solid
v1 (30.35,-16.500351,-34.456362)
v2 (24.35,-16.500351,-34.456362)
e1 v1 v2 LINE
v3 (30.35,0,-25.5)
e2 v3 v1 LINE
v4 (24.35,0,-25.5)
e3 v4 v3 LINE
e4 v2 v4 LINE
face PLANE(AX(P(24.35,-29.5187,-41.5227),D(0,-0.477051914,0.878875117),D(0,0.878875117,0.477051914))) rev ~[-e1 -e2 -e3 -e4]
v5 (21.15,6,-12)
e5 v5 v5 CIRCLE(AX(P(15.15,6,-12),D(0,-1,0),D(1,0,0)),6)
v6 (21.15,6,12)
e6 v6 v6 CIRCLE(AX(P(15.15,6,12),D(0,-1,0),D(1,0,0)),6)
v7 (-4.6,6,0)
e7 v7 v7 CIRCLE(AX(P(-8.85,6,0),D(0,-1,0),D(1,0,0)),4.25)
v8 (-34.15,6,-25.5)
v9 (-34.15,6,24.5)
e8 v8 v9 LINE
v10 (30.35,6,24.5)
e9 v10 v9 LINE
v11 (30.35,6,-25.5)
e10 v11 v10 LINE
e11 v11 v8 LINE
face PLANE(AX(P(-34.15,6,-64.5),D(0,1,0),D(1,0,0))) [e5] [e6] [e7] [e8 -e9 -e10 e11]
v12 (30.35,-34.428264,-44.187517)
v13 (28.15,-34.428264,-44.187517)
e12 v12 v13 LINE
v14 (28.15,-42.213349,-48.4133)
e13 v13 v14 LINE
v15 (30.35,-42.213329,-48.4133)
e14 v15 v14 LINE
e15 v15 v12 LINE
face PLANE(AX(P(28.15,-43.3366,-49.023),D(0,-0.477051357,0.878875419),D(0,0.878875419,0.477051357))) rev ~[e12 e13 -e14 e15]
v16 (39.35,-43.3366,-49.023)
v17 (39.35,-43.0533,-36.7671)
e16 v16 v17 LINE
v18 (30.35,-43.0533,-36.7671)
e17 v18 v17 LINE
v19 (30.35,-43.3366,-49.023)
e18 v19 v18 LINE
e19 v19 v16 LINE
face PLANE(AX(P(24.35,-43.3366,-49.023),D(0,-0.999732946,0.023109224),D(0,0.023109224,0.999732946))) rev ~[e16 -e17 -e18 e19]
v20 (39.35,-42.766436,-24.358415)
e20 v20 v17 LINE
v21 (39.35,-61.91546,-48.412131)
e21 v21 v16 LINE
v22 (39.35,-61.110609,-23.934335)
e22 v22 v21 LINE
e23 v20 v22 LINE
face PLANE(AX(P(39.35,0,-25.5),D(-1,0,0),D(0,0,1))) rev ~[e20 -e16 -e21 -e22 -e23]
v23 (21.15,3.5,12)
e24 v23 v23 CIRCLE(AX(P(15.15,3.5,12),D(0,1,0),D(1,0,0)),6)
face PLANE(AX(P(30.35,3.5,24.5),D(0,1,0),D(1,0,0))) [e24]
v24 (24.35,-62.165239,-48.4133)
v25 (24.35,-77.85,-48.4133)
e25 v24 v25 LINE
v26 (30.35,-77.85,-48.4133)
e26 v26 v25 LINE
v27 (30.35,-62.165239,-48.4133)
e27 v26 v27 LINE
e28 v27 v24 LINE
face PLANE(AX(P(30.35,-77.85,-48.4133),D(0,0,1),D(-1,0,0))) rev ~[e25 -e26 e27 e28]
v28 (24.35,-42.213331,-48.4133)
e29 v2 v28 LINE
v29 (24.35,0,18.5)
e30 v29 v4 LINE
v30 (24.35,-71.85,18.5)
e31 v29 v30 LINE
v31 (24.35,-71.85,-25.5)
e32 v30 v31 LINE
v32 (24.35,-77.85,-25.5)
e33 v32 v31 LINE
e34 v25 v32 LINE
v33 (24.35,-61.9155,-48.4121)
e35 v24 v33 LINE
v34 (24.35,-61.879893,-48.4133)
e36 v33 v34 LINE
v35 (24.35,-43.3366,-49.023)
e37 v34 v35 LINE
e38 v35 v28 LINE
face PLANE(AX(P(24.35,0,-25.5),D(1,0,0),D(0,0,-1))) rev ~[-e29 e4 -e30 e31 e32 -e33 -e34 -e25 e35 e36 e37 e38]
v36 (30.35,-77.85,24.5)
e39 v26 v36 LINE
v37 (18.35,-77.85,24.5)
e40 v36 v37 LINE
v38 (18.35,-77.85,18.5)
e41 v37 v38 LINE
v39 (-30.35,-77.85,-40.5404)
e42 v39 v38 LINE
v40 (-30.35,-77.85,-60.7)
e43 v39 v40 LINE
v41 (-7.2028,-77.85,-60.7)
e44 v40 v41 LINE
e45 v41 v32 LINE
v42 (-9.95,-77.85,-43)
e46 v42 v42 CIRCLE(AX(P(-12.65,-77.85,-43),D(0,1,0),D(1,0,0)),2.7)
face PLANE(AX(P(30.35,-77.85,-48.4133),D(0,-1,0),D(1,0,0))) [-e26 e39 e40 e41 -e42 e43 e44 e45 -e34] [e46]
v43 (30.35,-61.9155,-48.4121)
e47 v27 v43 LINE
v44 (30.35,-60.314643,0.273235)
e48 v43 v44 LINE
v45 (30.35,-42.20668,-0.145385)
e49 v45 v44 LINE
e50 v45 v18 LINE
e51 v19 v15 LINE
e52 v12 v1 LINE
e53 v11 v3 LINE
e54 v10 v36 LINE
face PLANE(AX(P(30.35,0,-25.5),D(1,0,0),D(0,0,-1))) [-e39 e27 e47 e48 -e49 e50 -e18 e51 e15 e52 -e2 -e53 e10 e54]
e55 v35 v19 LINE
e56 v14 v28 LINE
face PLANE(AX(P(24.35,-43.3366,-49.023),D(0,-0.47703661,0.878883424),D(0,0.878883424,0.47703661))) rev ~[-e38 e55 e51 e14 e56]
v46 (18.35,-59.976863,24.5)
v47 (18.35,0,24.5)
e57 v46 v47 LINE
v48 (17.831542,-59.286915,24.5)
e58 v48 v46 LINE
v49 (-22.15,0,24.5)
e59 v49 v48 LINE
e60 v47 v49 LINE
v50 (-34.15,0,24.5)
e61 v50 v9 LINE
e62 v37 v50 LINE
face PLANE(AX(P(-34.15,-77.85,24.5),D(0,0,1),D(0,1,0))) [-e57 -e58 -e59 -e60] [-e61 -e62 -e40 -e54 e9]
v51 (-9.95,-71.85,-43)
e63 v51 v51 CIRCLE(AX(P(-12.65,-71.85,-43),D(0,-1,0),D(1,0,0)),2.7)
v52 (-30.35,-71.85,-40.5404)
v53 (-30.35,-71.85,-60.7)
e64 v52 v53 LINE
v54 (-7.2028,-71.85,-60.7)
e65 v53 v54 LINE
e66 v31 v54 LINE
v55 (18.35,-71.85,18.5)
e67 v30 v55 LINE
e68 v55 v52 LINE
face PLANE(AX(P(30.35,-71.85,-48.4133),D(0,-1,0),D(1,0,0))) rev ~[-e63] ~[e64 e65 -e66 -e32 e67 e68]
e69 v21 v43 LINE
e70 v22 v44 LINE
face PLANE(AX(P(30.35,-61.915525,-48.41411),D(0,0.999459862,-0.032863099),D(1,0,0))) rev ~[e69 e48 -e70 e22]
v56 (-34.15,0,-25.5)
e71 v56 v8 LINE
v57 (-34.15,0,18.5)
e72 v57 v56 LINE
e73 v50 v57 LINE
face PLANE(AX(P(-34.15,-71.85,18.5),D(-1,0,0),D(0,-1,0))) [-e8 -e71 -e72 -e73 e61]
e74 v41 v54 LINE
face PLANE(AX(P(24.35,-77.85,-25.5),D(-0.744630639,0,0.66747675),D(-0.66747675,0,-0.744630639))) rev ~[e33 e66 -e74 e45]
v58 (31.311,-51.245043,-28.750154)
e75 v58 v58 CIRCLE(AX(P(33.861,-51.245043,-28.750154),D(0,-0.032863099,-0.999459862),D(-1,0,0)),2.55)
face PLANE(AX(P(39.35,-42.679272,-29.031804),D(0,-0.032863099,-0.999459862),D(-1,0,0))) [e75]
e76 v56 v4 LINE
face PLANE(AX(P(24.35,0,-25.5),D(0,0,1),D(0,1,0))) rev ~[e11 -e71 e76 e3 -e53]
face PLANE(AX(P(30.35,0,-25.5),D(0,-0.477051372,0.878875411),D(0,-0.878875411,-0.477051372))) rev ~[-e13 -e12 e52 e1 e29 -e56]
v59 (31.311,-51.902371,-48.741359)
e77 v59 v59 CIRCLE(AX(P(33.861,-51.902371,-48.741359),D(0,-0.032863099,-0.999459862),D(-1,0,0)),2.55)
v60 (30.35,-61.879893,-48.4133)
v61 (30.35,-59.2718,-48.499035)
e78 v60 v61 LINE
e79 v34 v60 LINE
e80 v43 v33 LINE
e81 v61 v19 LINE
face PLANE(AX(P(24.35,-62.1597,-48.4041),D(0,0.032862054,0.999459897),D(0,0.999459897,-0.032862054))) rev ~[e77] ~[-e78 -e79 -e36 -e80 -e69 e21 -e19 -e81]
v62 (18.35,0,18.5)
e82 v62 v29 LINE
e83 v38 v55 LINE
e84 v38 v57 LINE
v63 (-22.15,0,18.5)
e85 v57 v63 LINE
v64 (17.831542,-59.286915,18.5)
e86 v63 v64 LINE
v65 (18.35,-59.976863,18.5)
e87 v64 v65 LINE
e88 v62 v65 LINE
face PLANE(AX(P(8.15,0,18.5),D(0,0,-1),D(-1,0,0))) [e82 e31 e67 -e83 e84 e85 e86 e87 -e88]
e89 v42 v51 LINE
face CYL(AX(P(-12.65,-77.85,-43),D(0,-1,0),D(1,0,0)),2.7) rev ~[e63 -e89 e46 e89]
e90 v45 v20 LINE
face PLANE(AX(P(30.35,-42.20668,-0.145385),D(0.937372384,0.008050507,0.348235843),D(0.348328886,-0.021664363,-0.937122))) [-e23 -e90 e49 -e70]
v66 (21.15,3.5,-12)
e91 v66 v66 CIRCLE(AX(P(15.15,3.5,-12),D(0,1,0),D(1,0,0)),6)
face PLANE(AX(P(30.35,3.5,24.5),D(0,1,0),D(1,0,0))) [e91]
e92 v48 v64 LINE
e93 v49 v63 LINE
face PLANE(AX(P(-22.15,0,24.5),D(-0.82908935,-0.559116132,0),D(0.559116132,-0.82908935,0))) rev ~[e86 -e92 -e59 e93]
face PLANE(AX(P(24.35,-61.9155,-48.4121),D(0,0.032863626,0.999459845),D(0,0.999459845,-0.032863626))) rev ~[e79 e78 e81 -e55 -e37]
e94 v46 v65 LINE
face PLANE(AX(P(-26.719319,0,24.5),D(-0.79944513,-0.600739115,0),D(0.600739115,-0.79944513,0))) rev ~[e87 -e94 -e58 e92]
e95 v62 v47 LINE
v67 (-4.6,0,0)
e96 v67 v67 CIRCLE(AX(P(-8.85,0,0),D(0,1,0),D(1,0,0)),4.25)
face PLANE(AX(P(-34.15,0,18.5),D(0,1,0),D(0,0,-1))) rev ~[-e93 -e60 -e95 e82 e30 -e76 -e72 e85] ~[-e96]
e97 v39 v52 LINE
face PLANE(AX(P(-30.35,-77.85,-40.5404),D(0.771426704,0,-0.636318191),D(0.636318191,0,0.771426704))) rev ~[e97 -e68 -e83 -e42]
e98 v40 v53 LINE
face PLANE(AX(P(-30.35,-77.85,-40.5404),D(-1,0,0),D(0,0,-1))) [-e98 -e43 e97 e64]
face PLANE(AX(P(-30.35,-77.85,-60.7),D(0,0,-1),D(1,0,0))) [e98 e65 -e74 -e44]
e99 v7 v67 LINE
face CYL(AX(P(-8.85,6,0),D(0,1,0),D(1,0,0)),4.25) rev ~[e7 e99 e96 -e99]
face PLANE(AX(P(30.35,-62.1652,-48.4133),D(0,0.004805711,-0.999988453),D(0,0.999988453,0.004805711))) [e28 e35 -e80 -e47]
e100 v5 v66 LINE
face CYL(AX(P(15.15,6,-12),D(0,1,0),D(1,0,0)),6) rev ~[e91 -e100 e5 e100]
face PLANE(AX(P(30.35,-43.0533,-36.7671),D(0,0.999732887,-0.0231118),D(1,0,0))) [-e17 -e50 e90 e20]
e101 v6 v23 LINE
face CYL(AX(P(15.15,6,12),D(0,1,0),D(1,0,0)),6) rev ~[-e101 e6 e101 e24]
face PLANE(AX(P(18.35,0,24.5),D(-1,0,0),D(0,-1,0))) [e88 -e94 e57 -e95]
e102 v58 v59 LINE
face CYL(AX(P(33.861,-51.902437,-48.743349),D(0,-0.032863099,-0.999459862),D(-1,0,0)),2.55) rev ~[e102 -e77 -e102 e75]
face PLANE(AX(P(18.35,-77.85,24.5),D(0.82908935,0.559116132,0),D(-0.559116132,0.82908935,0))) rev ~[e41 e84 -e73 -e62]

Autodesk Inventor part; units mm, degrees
ref_plane "YZ Plane" through (0, 0, 0) normal (1, 0, 0) x (0, 1, 0)
ref_plane "XZ Plane" through (0, 0, 0) normal (0, 1, 0) x (-1, 0, 0)
ref_plane "XY Plane" through (0, 0, 0) normal (0, 0, 1) x (1, 0, 0)
sketch "Sketch1" plane through (0, 0, 0) normal (0, 1, 0) x (-1, 0, 0)
  line L0 (0, -25.5) -> (-34.15, -25.5)
  line L1 (-34.15, -25.5) -> (-34.15, 0)
  line L2 (-34.15, 0) -> (-34.15, 25.5)
  line L3 (-34.15, 25.5) -> (0, 25.5)
  line L4 (0, 25.5) -> (34.15, 25.5)
  line L5 (34.15, 25.5) -> (34.15, 0)
  line L6 (34.15, 0) -> (34.15, -25.5)
  line L7 (34.15, -25.5) -> (0, -25.5)
  point P0 (0, 0)
extrude "Extrusion1" add sketch "Sketch1" along normal blind 7
sketch "Sketch3" plane through (-34.15, 0, 25.5) normal (0, 0, 1) x (1, 0, 0)
  line L0 (0, 0) -> (0, -78.85)
  point P0 (34.15, 0)
  dimension "d7" = 78.85
sketch "Sketch4" plane through (-34.15, 0, -25.5) normal (-1, 0, 0) x (0, 0, 1)
  line L0 (51, 0) -> (51, -78.85)
  line L1 (51, -78.85) -> (-39, -78.85)
  line L2 (-39, -78.85) -> (-39, -71.85)
  line L3 (0, 0) -> (-39, -71.85)
  line L4 (0, 0) -> (51, 0)
  point P0 (25.5, 0)
  dimension "d10" = 90
  dimension "d11" = 7
extrude "Extrusion2" add sketch "Sketch4" against normal blind 7
sketch "Sketch7" plane through (-27.15, 0, -25.5) normal (1, 0, 0) x (0, 0, -1)
  line L0 (-51, -78.85) -> (39, -78.85) projected
  line L1 (-51, -78.85) -> (39, -78.85)
  line L2 (39, -78.85) -> (39, -71.85) projected
  line L3 (39, -78.85) -> (39, -71.85)
  line L4 (39, -71.85) -> (-51, -71.85)
  line L5 (-51, 0) -> (-51, -78.85) projected
  line L6 (-51, -78.85) -> (-51, -71.85)
  point P0 (-25.5, 0)
sketch "Sketch8" plane through (0, 0, 0) normal (0, -1, 0) x (1, 0, 0)
  circle A0 centre (8.15, 0) radius 5 projected
  line L0 (8.15, 18.5) -> (34.15, 18.5)
  line L1 (34.15, 25.5) -> (34.15, -25.5) projected
  line L2 (8.15, 25.5) -> (34.15, 25.5)
  line L3 (8.15, 25.5) -> (-27.15, 25.5)
  line L4 (-27.15, 25.5) -> (-27.15, -25.5) projected
  line L5 (8.15, 18.5) -> (-27.15, 18.5)
  line L6 (34.15, 25.5) -> (34.15, 18.5)
  line L7 (-27.15, 25.5) -> (-27.15, 18.5)
  point P0 (0, 0)
extrude "Extrusion6" add sketch "Sketch7" along normal blind 58.5
extrude "Extrusion7" add sketch "Sketch8" along normal blind 78.75 contours L5 L4 L3 L2 L1 L0
sketch "Sketch9" plane through (31.35, 0, -25.5) normal (1, 0, 0) x (0, 0, -1)
  line L0 (-51, -78.75) -> (-51, 7) projected
  line L1 (-44, 0) -> (-44, -71.85) projected
  line L2 (-51, -78.75) -> (-44, -78.75)
  line L3 (-44, -78.75) -> (-44, -71.85)
  line L4 (-44, -71.85) -> (-51, -71.85)
  line L5 (-51, -71.85) -> (-51, -78.75)
  point P0 (-25.5, 0)
extrude "Extrusion8" cut sketch "Sketch9" along normal blind 10
sketch "Sketch10" plane through (0, 7, 0) normal (0, 1, 0) x (1, 0, 0)
  point P0 (0, 0)
sketch "Boceto11" plane through (-34.15, -78.85, -64.5) normal (0, -1, 0) x (1, 0, 0)
  line L0 (0, 0) -> (65.5, 0) projected
  line L1 (65.5, 89.9985) -> (65.5, 0)
  line L2 (65.5, 0) -> (71.065, 0)
  line L3 (71.065, 0) -> (71.065, 89.9985)
  line L4 (71.065, 89.9985) -> (65.5, 89.9985)
  line L5 (65.5, 89.9985) -> (65.5, 95.8996)
  line L6 (65.5, 95.8996) -> (71.065, 89.9985)
  point P0 (34.15, 64.5)
extrude "Extrusión9" cut sketch "Boceto11" against normal blind 100
sketch "Boceto12" plane through (31.35, 0, -25.5) normal (1, 0, 0) x (0, 0, -1)
  line L0 (-44, 0) -> (-44, -71.85) projected
  line L1 (-44, 0) -> (-44, -71.85)
  line L2 (39, -71.85) -> (39, -78.85) projected
  line L3 (-44, -71.85) -> (39, -71.85)
  line L4 (-44, 0) -> (0, 0) projected
  line L5 (39, -71.85) -> (0, 0)
  line L6 (0, 0) -> (-44, 0)
  point P0 (-25.5, 0)
extrude "Extrusión10" add sketch "Boceto12" against normal blind 7
sketch "Boceto13" plane through (-34.15, 7, -25.5) normal (-1, 0, 0) x (0, 0, 1)
  line L0 (0, -7) -> (0, 0) projected
  line L1 (44, -7) -> (0, -7) projected
  line L2 (0, -7) -> (44, -7)
  line L3 (44, -78.85) -> (-39, -78.85) projected
  line L4 (44, -7) -> (44, -78.85)
  line L5 (44, -78.85) -> (-39, -78.85)
  line L6 (-39, -78.85) -> (0, -7)
  point P0 (25.5, -7)
extrude "Extrusión11" cut sketch "Boceto13" against normal blind 7
sketch "Boceto15" plane through (-34.15, 0, -25.5) normal (0, 0, -1) x (-1, 0, 0)
  point P0 (-34.15, 0)
sketch "Boceto19" plane through (-34.15, -78.85, -64.5) normal (0, -1, 0) x (1, 0, 0)
  line L0 (65.5, 90) -> (65.5, 0) projected
  line L1 (65.5, 0) -> (65.5, 40.9323)
  line L2 (81.7334, 40.9323) -> (65.5, 40.9323)
  line L3 (81.7334, 40.9323) -> (81.7334, 0)
  line L4 (81.7334, 0) -> (65.5, 0)
  point P0 (34.15, 64.5)
extrude "Extrusión17" cut sketch "Boceto19" against normal blind 100
sketch "Boceto20" plane through (24.35, 0, -25.5) normal (-1, 0, 0) x (0, 0, 1)
  line L0 (-29.1839, -53.7657) -> (-27.9516, -53.3206) projected
  line L1 (0, 0) -> (-39, -71.85) projected
  line L2 (-29.1839, -53.7657) -> (-27.8697, -51.3447)
  line L3 (-27.8697, -51.3447) -> (-27.9516, -53.3206) projected
  line L4 (-27.8697, -51.3447) -> (-27.9516, -53.3206)
  line L5 (-27.9516, -53.3206) -> (-29.1839, -53.7657)
  point P0 (25.5, 0)
extrude "Extrusión18" add sketch "Boceto20" against normal blind 7
sketch "Boceto21" plane through (24.35, 0, -25.5) normal (-1, 0, 0) x (0, 0, 1)
  point P0 (25.5, 0)
sketch "Boceto22" plane through (24.35, 0, -25.5) normal (-1, 0, 0) x (0, 0, 1)
  point P0 (25.5, 0)
sketch "Boceto24" plane through (31.35, 0, -25.5) normal (1, 0, 0) x (0, 0, -1)
  point P0 (-25.5, 0)
sketch "Boceto26" plane through (24.35, 0, -25.5) normal (-1, 0, 0) x (0, 0, 1)
  point P0 (25.5, 0)
sketch "Boceto27" plane through (31.35, 0, -25.5) normal (1, 0, 0) x (0, 0, -1)
  line L0 (-51, 7) -> (0, 7) projected
  line L1 (0, 7) -> (16.0227, 7)
  line L2 (16.0227, 7) -> (16.0227, -29.5187)
  line L3 (0, 0) -> (39, -71.85) projected
  line L4 (16.0227, -29.5187) -> (0, 0)
  line L5 (0, 0) -> (0, 7)
  point P0 (-25.5, 0)
extrude "Extrusión22" add sketch "Boceto27" against normal blind 7
sketch "Boceto28" plane through (24.35, 0, -25.5) normal (-1, 0, 0) x (0, 0, 1)
  line L0 (-16.0227, -29.5187) -> (-39, -71.85) projected
  line L1 (-16.0227, -29.5187) -> (0, 0)
  line L2 (0, 7) -> (-16.0227, 7) projected
  line L3 (0, 0) -> (0, 7)
  line L4 (0, 7) -> (-16.0227, 7)
  line L5 (-16.0227, 7) -> (-16.0227, -29.5187) projected
  line L6 (-16.0227, 7) -> (-16.0227, -29.5187)
  point P0 (25.5, 0)
extrude "Extrusión23" cut sketch "Boceto28" against normal blind 7
sketch "Boceto29" plane through (31.35, 0, -25.5) normal (1, 0, 0) x (0, 0, -1)
  point P0 (-25.5, 0)
sketch "Boceto31" plane through (-34.15, -78.85, -64.5) normal (0, 0, -1) x (-1, 0, 0)
  line L0 (0, 7) -> (0, 0) projected
  line L1 (0, 0) -> (0, 1)
  line L2 (0, 1) -> (-65.5, 1)
  line L3 (-65.5, 0) -> (-65.5, 85.85) projected
  line L4 (-65.5, 1) -> (-64.5, 1)
  line L5 (-64.5, 1) -> (-64.5, 85.85)
  line L6 (0, 85.85) -> (-65.5, 85.85) projected
  line L7 (-64.5, 85.85) -> (0, 85.85)
  line L8 (0, 85.85) -> (0, 84.85)
  line L9 (0, 0) -> (0, 85.85) projected
  line L10 (0, 84.85) -> (-64.5, 84.85)
  line L11 (-64.5, 85.85) -> (-65.5, 85.85)
  line L12 (0, 0) -> (-65.5, 0) projected
  line L13 (-65.5, 85.85) -> (-65.5, 0)
  line L14 (-65.5, 0) -> (0, 0)
  point P0 (-34.15, 78.85)
  dimension "d84" = 1
  dimension "d85" = 1
  dimension "d86" = 1
extrude "Extrusión26" cut sketch "Boceto31" against normal blind 1000 contours L0 L12 L3 L2 | L10 L5 L6 L8 | L2 L3 L6 L5
sketch "Boceto32" plane through (-34.15, -71.85, 18.5) normal (-1, 0, 0) x (0, 0, 1)
  line L0 (-83, -6) -> (7, -6) projected
  line L1 (7, -6) -> (6, -6)
  line L2 (6, -6) -> (6, 77.85)
  line L3 (7, 77.85) -> (-44, 77.85) projected
  line L4 (7, -6) -> (7, 77.85) projected
  line L5 (6, 77.85) -> (7, 77.85)
  line L6 (7, 77.85) -> (7, -6)
  point P0 (-18.5, 71.85)
  dimension "d89" = 1
extrude "Extrusión27" cut sketch "Boceto32" against normal blind 100
sketch "Boceto33" plane through (-34.15, 6, -25.5) normal (0, 1, 0) x (1, 0, 0)
  line L0 (0, 0) -> (0, -44) projected
  line L1 (0, 0) -> (0, -25.5)
  line L2 (0, -25.5) -> (25.3, -25.5)
  circle A0 centre (25.3, -25.5) radius 4.25
  point P0 (34.15, -25.5)
  dimension "d92" = 25.5
  dimension "d93" = 25.3
  dimension "d94" = 8.5
extrude "Extrusión28" cut sketch "Boceto33" against normal blind 10
sketch "Boceto34" plane through (30.35, -77.85, -64.5) normal (1, 0, 0) x (0, 0, -1)
  point P0 (-64.5, 77.85)
sketch "Boceto35" plane through (30.35, -77.85, -64.5) normal (1, 0, 0) x (0, 0, -1)
  circle A0 centre (-24.4828, 41.285) radius 2.6
  point P0 (-64.5, 77.85)
  dimension "d101" = 5.2
extrude "Extrusión29" cut sketch "Boceto35" against normal blind 10
sketch "Boceto36" plane through (30.35, -77.85, -64.5) normal (1, 0, 0) x (0, 0, -1)
  point P0 (-64.5, 77.85)
sketch "Boceto37" plane through (30.35, -77.85, -64.5) normal (1, 0, 0) x (0, 0, -1)
  line L0 (-39, 77.85) -> (0, 6) projected
  line L1 (-12.3437, 28.741) -> (-12.3437, 48.1268)
  line L2 (-12.3437, 48.1268) -> (-28.4038, 58.3285)
  line L3 (-12.3437, 28.741) -> (-28.4038, 58.3285)
  point P0 (-64.5, 77.85)
extrude "Extrusión30" add sketch "Boceto37" against normal blind 6
fillet "Empalme3" radius 10 3 edges at (27.35, -29.7232, -52.1563) (27.35, -49.109, -52.1563) (27.35, -19.5215, -36.0962)
sketch "Boceto38" plane through (30.35, -77.85, -64.5) normal (1, 0, 0) x (0, 0, -1)
  point P0 (-64.5, 77.85)
sketch "Boceto39" plane through (30.35, -77.85, -64.5) normal (1, 0, 0) x (0, 0, -1)
  line L0 (-6.8274, 18.5782) -> (-18.8698, 18.5782)
  line L1 (-18.8698, 18.5782) -> (-18.2969, 35.7502)
  line L2 (-18.2969, 35.7502) -> (-20.685, 39.2299)
  line L3 (-20.685, 39.2299) -> (-19.4909, 52.6668)
  line L4 (-26.2143, 56.9377) -> (-16.9818, 51.073) projected
  line L5 (-6.8274, 18.5782) -> (-5.5662, 48.0514)
  line L6 (-5.5662, 48.0514) -> (-19.4909, 52.6668)
  point P0 (-64.5, 77.85)
extrude "Extrusión31" cut sketch "Boceto39" against normal blind 2.2
fillet "Empalme4" radius 10 1 edges at (29.25, -25.1832, -45.0091)
sketch "Boceto40" plane through (24.35, 0, -25.5) normal (-1, 0, 0) x (0, 0, 1)
  line L0 (-26.6563, -35.218) -> (-26.6563, -46.57) projected
  line L1 (-26.6563, -35.218) -> (-24.0221, -30.4862) construction
  arc A0 (-12.7857, -20.9123) -> (-9.3588, -17.2419) centre (-18.1476, -12.4713) ccw projected
  line L2 (-24.0221, -30.4862) -> (-10.7107, -19.1566) construction
  spline S0 degree 2 poles (-26.6563, -35.218) (-24.0221, -30.4862) (-10.7107, -19.1566) knots 1 1 1 2 2 2
  line L3 (-26.6563, -35.218) -> (-10.7107, -35.218)
  line L4 (-10.7107, -35.218) -> (-10.7107, -19.1566)
  line L5 (-10.7107, -19.1566) -> (-26.6563, -19.1566)
  line L6 (-26.6563, -19.1566) -> (-26.6563, -35.218)
  point P0 (25.5, 0)
  point P1 (-10.7107, -19.1566)
extrude "Extrusión32" cut sketch "Boceto40" against normal blind 6 contours S0 L6 L5
fillet "Empalme5" radius 10 1 edges at (26.25, -35.218, -52.1563)
sketch "Boceto41" plane through (-34.15, -71.85, 18.5) normal (0, 1, 0) x (1, 0, 0)
  circle A0 centre (11.5, 71.5) radius 5 projected
  circle A1 centre (11.5, 71.5) radius 6
  line L0 (11.5, 71.5) -> (-12.5, 71.5)
  line L1 (-12.5, 71.5) -> (-12.5, 95.5)
  line L2 (-12.5, 95.5) -> (11.5, 95.5)
  line L3 (11.5, 95.5) -> (11.5, 71.5)
  line L4 (64.5, 76.1726) -> (64.5, 83) projected
  line L5 (64.5, 83) -> (64.5, 95.5)
  line L6 (64.5, 95.5) -> (11.5, 95.5)
  line L7 (0, 83) -> (0, -6) projected
  line L8 (0, -6) -> (-12.5, -6)
  line L9 (-12.5, -6) -> (-12.5, 71.5)
  line L10 (64.5, 83) -> (11.5, 83)
  line L11 (0, 83) -> (58.5, 83) projected
  point P0 (34.15, 18.5)
  dimension "d113" = 12
  dimension "d114" = 24
  dimension "d115" = 24
extrude "Extrusión33" add sketch "Boceto41" against normal blind 6 contours L11 L7 L0 L1 L2 L3 | L3 L6 L5 L10 | L7 L8 L9 L0
sketch "Boceto43" plane through (30.35, 6, 24.5) normal (0, 1, 0) x (1, 0, 0)
  circle A0 centre (-39.2, 24.5) radius 4.25 projected
  line L0 (-39.2, 24.5) -> (-15.2, 24.5)
  line L1 (-15.2, 24.5) -> (-15.2, 12.5)
  line L2 (-15.2, 12.5) -> (-15.2, 36.5)
  circle A1 centre (-15.2, 36.5) radius 6
  circle A2 centre (-15.2, 12.5) radius 6
  point P0 (-30.35, 24.5)
  dimension "d123" = 24
  dimension "d124" = 12
  dimension "d125" = 24
  dimension "d126" = 12
  dimension "d127" = 12
extrude "Extrusión35" cut sketch "Boceto43" against normal blind 2.5 contours A1 | A2
sketch "Boceto44" plane through (24.35, 0, -25.5) normal (-1, 0, 0) x (0, 0, 1)
  line L0 (0, 0) -> (-9.3588, -17.2419) projected
  line L1 (-9.3588, -17.2419) -> (-30.5215, -33.5874)
  line L2 (-30.5215, -33.5874) -> (-30.5215, -56.2301)
  line L3 (-27.8675, -51.3405) -> (-39, -71.85) projected
  arc A0 (-12.666, -20.8351) -> (-9.3588, -17.2419) centre (-18.1476, -12.4713) ccw projected
  line L4 (-30.5215, -56.2301) -> (-9.3588, -17.2419)
  point P0 (25.5, 0)
extrude "Extrusión36" add sketch "Boceto44" against normal blind 6
sketch "Boceto45" plane through (30.35, 0, -25.5) normal (1, 0, 0) x (0, 0, -1)
  line L0 (18.315, -38.6201) -> (18.6875, -34.4282) projected
  line L1 (18.6875, -34.4282) -> (19.9402, -25.4146)
  line L2 (9.3588, -17.2419) -> (30.5215, -33.5874) projected
  line L3 (30.5215, -56.2301) -> (30.5215, -33.5874) projected
  line L4 (19.9402, -25.4146) -> (30.5215, -33.5874)
  line L5 (30.5215, -33.5874) -> (32.1519, -59.2336)
  line L6 (30.5215, -56.2301) -> (39, -71.85) projected
  line L7 (32.1726, -59.2718) -> (20.1302, -59.2718) projected
  line L8 (32.1726, -59.2718) -> (18.315, -38.6201)
  point P0 (-25.5, 0)
extrude "Extrusión37" cut sketch "Boceto45" against normal blind 2.2 contours L0 L1 L2 L3 L6 L8
fillet "Empalme7" radius 4 3 edges at (26.25, -33.5874, -56.0215) (27.35, -17.2419, -34.8588) (26.25, -56.2301, -56.0215)
sketch "Boceto46" plane through (-34.15, -71.85, 18.5) normal (0, 1, 0) x (1, 0, 0)
  line L0 (-12.5, -6) -> (0, -6) projected
  line L1 (0, -6) -> (0, 95.5)
  line L2 (-12.5, 95.5) -> (64.5, 95.5) projected
  line L3 (0, 95.5) -> (-12.5, 95.5)
  line L4 (-12.5, 95.5) -> (-12.5, -6)
  line L5 (-12.5, -6) -> (0, -6)
  point P0 (34.15, 18.5)
extrude "Extrusión38" cut sketch "Boceto46" against normal blind 10
sketch "Boceto47" plane through (-34.15, -71.85, 18.5) normal (0, 1, 0) x (1, 0, 0)
  line L0 (0, 0) -> (0, -6) projected
  line L1 (0, 95.5) -> (26.5, 95.5)
  line L2 (26.5, 95.5) -> (26.5, 69)
  line L3 (26.5, 69) -> (0, 69)
  line L4 (0, 69) -> (0, 95.5)
  circle A0 centre (26.5, 69) radius 6
  point P0 (34.15, 18.5)
  dimension "d137" = 26.5
  dimension "d138" = 26.5
  dimension "d139" = 12
extrude "Extrusión39" cut sketch "Boceto47" against normal blind 10 contours A0 L3 L2 | L2 L3 A0
sketch "Sketch48" plane through (-34.15, -71.85, 18.5) normal (0, 1, 0) x (1, 0, 0)
  circle A0 centre (26.5, 69) radius 6 projected
  line L0 (29.7126, 74.0675) -> (26.5, 69)
  circle A1 centre (26.5, 69) radius 18
  line L1 (8.5, 69) -> (8.5, 0)
  line L2 (0, 0) -> (58.5, 0) projected
  line L3 (0, 0) -> (8.5, 0)
  line L4 (26.5, 87) -> (64.5, 87)
  line L5 (64.5, 83) -> (64.5, 95.5) projected
  line L6 (0, 0) -> (0, 95.5) projected
  line L7 (64.5, 95.5) -> (0, 95.5)
  line L8 (0, 95.5) -> (0, 0)
  point P0 (34.15, 18.5)
  dimension "d142" = 36
extrude "Extrusion40" cut sketch "Sketch48" against normal blind 10 contours A1 L1 L2 L6 L7 L5 L4
sketch "Sketch49" plane through (24.35, 0, 18.5) normal (0, 0, -1) x (-1, 0, 0)
  line L0 (58.5, -77.85) -> (50, -77.85) projected
  line L1 (58.5, -77.85) -> (50, -77.85)
  line L2 (50, -71.85) -> (0, -71.85) projected
  line L3 (50, -77.85) -> (50, -71.85)
  line L4 (50, -71.85) -> (58.5, -71.85)
  line L5 (58.5, -71.85) -> (58.5, -77.85)
  point P0 (24.35, 0)
extrude "Extrusion41" add sketch "Sketch49" along normal blind 20
fillet "Fillet8" radius 7 1 edges at (-34.15, -74.85, -1.5)
fillet "Fillet9" radius 2 1 edges at (-25.65, -74.85, -1.5)
sketch "Sketch50" plane through (28.15, -77.85, -64.5) normal (1, 0, 0) x (0, 0, -1)
  point P0 (-64.5, 77.85)
sketch "Sketch51" plane through (-34.15, -77.85, 24.5) normal (0, -1, 0) x (1, 0, 0)
  line L0 (64.5, -50) -> (64.5, 0) projected
  line L1 (64.5, 0) -> (-39.5, 0)
  line L2 (-39.5, 0) -> (-39.5, -120)
  line L3 (-39.5, -120) -> (64.5, -120)
  line L4 (64.5, -120) -> (64.5, 0)
  point P0 (34.15, -24.5)
  dimension "d149" = 104
  dimension "d150" = 120
sketch "Sketch52" plane through (30.35, 0, -25.5) normal (1, 0, 0) x (0, 0, -1)
  line L0 (0, 0) -> (-44, 0) projected
  line L1 (32.1726, -59.2718) -> (39, -71.85) projected
  line L2 (0, 0) -> (39, -71.85)
  line L3 (22.9041, -62.1597) -> (23.523, -43.3366)
  line L4 (22.9041, -62.1597) -> (39, -71.85)
  line L5 (39, -71.85) -> (32.1726, -12.8018)
  line L6 (0, 0) -> (0, 6) projected
  line L7 (32.1726, -12.8018) -> (0, 0)
  point P0 (-25.5, 0)
extrude "Extrusion42" cut sketch "Sketch52" against normal blind 10
sketch "Sketch53" plane through (28.15, -77.85, -64.5) normal (1, 0, 0) x (0, 0, -1)
  line L0 (-16.0959, 15.6903) -> (0, 6) projected
  line L1 (-16.001, 18.5782) -> (-15.477, 34.5134) projected
  line L2 (-16.0959, 15.6903) -> (-15.477, 34.5134)
  line L3 (-15.477, 34.5134) -> (-20.7531, 44.2336)
  line L4 (-39, 77.85) -> (-15.477, 34.5134) projected
  line L5 (-20.7531, 44.2336) -> (-21.8828, 18.4708)
  line L6 (-21.8828, 18.4708) -> (-16.0045, 18.4708)
  point P0 (-64.5, 77.85)
extrude "Extrusion43" add sketch "Sketch53" along normal blind 2.2
sketch "Sketch54" plane through (30.35, 0, -25.5) normal (1, 0, 0) x (0, 0, -1)
  circle A0 centre (14.5172, -36.565) radius 2.6 projected
  circle A1 centre (14.5172, -36.565) radius 2.6
  point P0 (-25.5, 0)
extrude "Extrusion44" add sketch "Sketch54" against normal blind 6
sketch "Sketch55" plane through (30.35, 0, -25.5) normal (1, 0, 0) x (0, 0, -1)
  line L0 (39, -71.85) -> (22.9041, -62.1597) projected
  line L1 (22.9041, -62.1597) -> (13.9423, -61.864)
  line L2 (22.9041, -62.1597) -> (23.523, -43.3366) projected
  line L3 (19.528, -36.1291) -> (23.523, -43.3366)
  line L4 (22.9041, -62.1597) -> (23.523, -43.3366)
  line L5 (5.6191, -42.216) -> (13.9423, -61.864)
  line L6 (5.6191, -42.216) -> (19.528, -36.1291)
  point P0 (-25.5, 0)
sketch "Sketch56" plane through (24.35, 0, -25.5) normal (-1, 0, 0) x (0, 0, 1)
  line L0 (-22.9041, -62.1597) -> (-23.523, -43.3366) projected
  line L1 (-23.523, -43.3366) -> (-22.9041, -62.1597)
  line L2 (-22.9041, -62.1597) -> (-10.8346, -61.7628)
  line L3 (-10.8346, -61.7628) -> (-11.7615, -21.6683)
  line L4 (0, 0) -> (-23.523, -43.3366) projected
  line L5 (-23.523, -43.3366) -> (-11.2671, -43.0533)
  line L6 (-23.523, -43.3366) -> (-22.9041, -62.1597)
  line L7 (-22.9041, -62.1597) -> (-10.8346, -61.7628)
  line L8 (-10.8346, -61.7628) -> (-11.2671, -43.0533)
  line L9 (-11.2671, -43.0533) -> (-23.523, -43.3366)
  point P0 (25.5, 0)
extrude "Extrusion45" add sketch "Sketch56" against normal blind 15 contours L0 L5 L3 L2
sketch "Sketch57" plane through (39.35, -43.3366, -49.023) normal (0, -0.0328631, -0.9994599) x (-1, 0, 0)
  line L0 (0.989, -8.5704) -> (9.989, -8.5704)
  line L1 (9, 46.8938) -> (9, -36.911) projected
  circle A0 centre (5.489, -8.5704) radius 2.55
  line L2 (5.489, -8.5704) -> (0.989, -8.5704)
  line L3 (5.489, -8.5704) -> (-0.011, -8.5704)
  point P0 (39.35, 41.7021)
  dimension "d218" = 5.5
  dimension "d219" = 5.1
extrude "Extrusion46" cut sketch "Sketch57" against normal blind 15
sketch "Sketch58" plane through (39.35, 0, -25.5) normal (1, 0, 0) x (0, 0, -1)
  point P0 (-25.5, 0)
sketch "Sketch59" plane through (30.35, -43.0533, -36.7671) normal (0, 0.9997329, -0.0231118) x (1, 0, 0)
  line L0 (9, 0) -> (9, 12.0754) projected
  line L1 (0, 32.5286) -> (0, -60.4465) projected
  line L2 (9, 0) -> (0, 0)
  line L3 (0, 0) -> (0, -12.412)
  line L4 (0, -12.412) -> (9, -12.412)
  line L5 (9, -12.412) -> (9, 0)
  line L6 (0, -12.412) -> (0, -36.6315)
  line L7 (0, -36.6315) -> (9, -12.412)
  point P0 (-30.35, -37.7523)
extrude "Extrusion47" add sketch "Sketch59" against normal blind 18.7159
sketch "Sketch60" plane through (30.35, 0, -25.5) normal (1, 0, 0) x (0, 0, -1)
  line L0 (22.9041, -62.1597) -> (10.8346, -61.7628) projected
  line L1 (22.9041, -62.1597) -> (-35.3443, -60.8131)
  line L2 (10.8346, -61.7642) -> (-25.7871, -60.9175) projected
  line L3 (-35.3443, -60.8131) -> (-11.8971, -71.85)
  line L4 (-44, -71.85) -> (39, -71.85) projected
  line L5 (22.9041, -62.1597) -> (-11.8971, -71.85)
  point P0 (-25.5, 0)
extrude "Extrusion48" cut sketch "Sketch60" along normal blind 18.7159
sketch "Sketch61" plane through (39.35, -43.3366, -49.023) normal (0, -0.0328631, -0.9994599) x (-1, 0, 0)
  point P0 (39.35, 41.7021)
sketch "Sketch62" plane through (39.35, -43.3366, -49.023) normal (0, -0.0328631, -0.9994599) x (-1, 0, 0)
  line L0 (9, -18.8333) -> (9, -18.8346) projected
  line L1 (9, -18.8346) -> (-1.0251, -18.8346)
  line L2 (-1.0251, -18.8346) -> (-1.0251, -24.5564)
  line L3 (-1.0251, -24.5564) -> (9, -24.5564)
  line L4 (9, -24.5564) -> (9, -18.8346)
  point P0 (39.35, 41.7021)
extrude "Extrusion49" cut sketch "Sketch62" against normal blind 100
sketch "Sketch63" plane through (39.35, -43.3366, -49.023) normal (0, -0.0328631, -0.9994599) x (-1, 0, 0)
  line L0 (9, 46.8938) -> (9, -36.911) projected
  line L1 (9, -18.5889) -> (-0.3497, -18.5889)
  line L2 (-0.3497, -18.5889) -> (-0.3497, -22.6635)
  line L3 (-0.3497, -22.6635) -> (9, -22.6635)
  line L4 (9, -22.6635) -> (9, -18.5889)
  point P0 (39.35, 41.7021)
  point P1 (9, -22.6635)
extrude "Extrusion50" cut sketch "Sketch63" against normal blind 100
sketch "Sketch64" plane through (-34.15, 6, -25.5) normal (0, 1, 0) x (1, 0, 0)
  line L0 (58.5, -44) -> (58.5, 39) projected
  line L1 (58.5, 23.5443) -> (58.5, 43.0724)
  line L2 (58.5, 43.0724) -> (64.7623, 43.0724)
  line L3 (64.7623, 43.0724) -> (64.7623, 23.523)
  line L4 (64.5, 23.523) -> (73.5, 23.523) projected
  line L5 (58.5, 23.523) -> (64.5, 23.523) projected
  line L6 (58.5, 23.523) -> (64.7623, 23.523)
  point P0 (34.15, -25.5)
extrude "Extrusion51" cut sketch "Sketch64" against normal blind 100
sketch "Sketch65" plane through (-34.15, 6, -25.5) normal (0, 1, 0) x (1, 0, 0)
  point P0 (34.15, -25.5)
sketch "Sketch66" plane through (-34.15, -77.85, 24.5) normal (0, -1, 0) x (1, 0, 0)
  line L0 (64.5, -73.523) -> (64.5, 0) projected
  line L1 (64.5, -72.9133) -> (58.4721, -72.9133)
  line L2 (58.4721, -72.9133) -> (58.4721, -73.523)
  line L3 (58.4721, -73.523) -> (64.5, -73.523)
  line L4 (64.5, -73.523) -> (64.5, -72.9133)
  point P0 (34.15, -24.5)
extrude "Extrusion52" cut sketch "Sketch66" against normal blind 100
sketch "Sketch67" plane through (24.35, 0, -25.5) normal (-1, 0, 0) x (0, 0, 1)
  line L0 (-22.9121, -61.9155) -> (-23.523, -43.3366) projected
  line L1 (-22.9121, -61.9155) -> (-23.523, -43.3366)
  line L2 (-22.9133, -43.3225) -> (-22.9133, -42.2133) projected
  line L3 (-23.523, -43.3366) -> (-22.9133, -42.2133)
  line L4 (-22.9133, -42.2133) -> (-22.9121, -61.9155)
  point P0 (25.5, 0)
extrude "Extrusion53" add sketch "Sketch67" against normal blind 6
sketch "Sketch68" plane through (24.35, -62.1597, -48.4041) normal (0, 0.8567227, -0.5157773) x (1, 0, 0)
  point P0 (-24.35, -73.5294)
sketch "Sketch69" plane through (30.35, 0, -25.5) normal (1, 0, 0) x (0, 0, -1)
  point P0 (-25.5, 0)
sketch "Sketch70" plane through (30.35, 0, -25.5) normal (1, 0, 0) x (0, 0, -1)
  line L0 (22.9121, -61.9155) -> (23.523, -43.3366) projected
  line L1 (23.523, -43.3366) -> (22.9041, -62.1597) projected
  line L2 (22.9121, -61.9155) -> (22.9041, -62.1597)
  line L3 (22.9041, -62.1597) -> (22.9133, -62.1652)
  line L4 (22.9133, -62.1652) -> (22.9121, -61.9155)
  point P0 (-25.5, 0)
  point P1 (22.9133, -77.85)
extrude "Extrusion54" add sketch "Sketch70" against normal blind 6
sketch "Sketch71" plane through (-34.15, -77.85, 24.5) normal (0, 0, 1) x (1, 0, 0)
  line L0 (0, 0) -> (0, 83.85) projected
  line L1 (0, 83.85) -> (0, 77.85)
  line L2 (64.5, 83.85) -> (64.5, 77.85) projected
  line L3 (0, 83.85) -> (64.5, 83.85)
  line L4 (64.5, 83.85) -> (64.5, 77.85)
  line L5 (64.5, 77.85) -> (0, 77.85)
  line L6 (64.5, 83.85) -> (64.5, 0)
  line L7 (64.5, 0) -> (58.5, 0)
  line L8 (58.5, 0) -> (58.5, 83.85)
  line L9 (0, 77.85) -> (58.5, 0)
  line L10 (58.5, 0) -> (62.7426, 4.2426)
  line L11 (58.5, 0) -> (64.5, 0) construction
  line L12 (0, 77.85) -> (4.2426, 82.0926)
  line L13 (0, 77.85) -> (6, 77.85) construction
  line L14 (4.2426, 82.0926) -> (62.7426, 4.2426)
  line L15 (0, 77.85) -> (0, 0)
  line L16 (58.5, 0) -> (0, 0)
  point P0 (34.15, 77.85)
  point P1 (7.4308, 77.85)
  point P2 (58.5, 9.8886)
  point P3 (58.5, 77.85)
  dimension "d177" = 6
  dimension "d178" = 6
  dimension "d179" = 45
  dimension "d180" = 6
  dimension "d181" = 45
extrude "Extrusion55" cut sketch "Sketch71" against normal blind 6 contours L5 L8 L14
extrude "Extrusion56" cut sketch "Sketch71" against normal blind 6 contours L0 L9 L16
sketch "Sketch72" plane through (-25.65, -77.85, -50.5) normal (0, -1, 0) x (1, 0, 0)
  line L0 (50, -18) -> (50, 1.477) projected
  line L1 (18, -18) -> (50, -18) projected
  line L2 (50, 1.477) -> (18, -18)
  line L3 (50, 75) -> (50, 69) projected
  line L4 (50, 69) -> (0, 0)
  line L5 (0, 0) -> (-27.3378, 0)
  line L6 (0, 47.0139) -> (0, 0) projected
  line L7 (-27.3378, 0) -> (-27.3378, 69)
  line L8 (-27.3378, 69) -> (50, 69)
  line L9 (50, 1.477) -> (75.3518, 1.477)
  line L10 (75.3518, 1.477) -> (75.3518, -41.3346)
  line L11 (75.3518, -41.3346) -> (14.5595, -36.9915)
  line L12 (14.5595, -36.9915) -> (18, -18)
  point P0 (25.65, 50.5)
extrude "Extrusion57" cut sketch "Sketch72" against normal blind 6
fillet "Fillet10" radius 10 2 edges at (-25.65, -74.85, -50.5) (-7.65, -74.85, -68.5)
sketch "Sketch73" plane through (-34.15, 6, 24.5) normal (0, 0, 1) x (1, 0, 0)
  line L0 (0, -5.9793) -> (12, -6)
  line L1 (58.5, -6) -> (0, -6) projected
  line L2 (64.5, -83.85) -> (58.5, -83.85) projected
  line L3 (64.5, -83.85) -> (52.5, -83.85)
  line L4 (29.4334, -83.85) -> (58.5, -83.85) projected
  line L5 (52.5, -83.85) -> (0, -6)
  line L6 (12, -6) -> (64.5, -83.85)
  line L7 (64.5, 0) -> (64.5, -83.85) projected
  line L8 (64.5, 0) -> (52.5, 0)
  line L9 (43.3, 0) -> (55.3, 0) projected
  line L10 (52.5, 0) -> (52.5, -83.85)
  line L11 (64.5, -83.85) -> (64.5, 0)
  point P0 (34.15, -6)
  point P1 (0, -5.9793)
  point P2 (52.5, -66.0557)
  dimension "d189" = 12
  dimension "d190" = 12
  dimension "d191" = 12
extrude "Extrusion58" add sketch "Sketch73" against normal blind 6 contours L6 L10 L5 L1 | L10 L8 L7 L6 | L6 L2 L3 L10
sketch "Sketch74" plane through (24.3221, -77.85, -48.4133) normal (0, -1, 0) x (1, 0, 0)
  line L0 (-5.9721, 66.9133) -> (-5.9721, 72.9133) projected
  arc A0 (-47.6253, 1.1519) -> (-48.9724, -8.0022) centre (-39.5278, -4.7158) ccw projected
  line L1 (-5.9721, 66.9133) -> (-47.6253, 1.1519)
  line L2 (-47.6253, 1.1519) -> (2.7458, 61.3913)
  line L3 (2.7458, 61.3913) -> (2.7458, 69.1583)
  line L4 (2.7458, 69.1583) -> (-5.9721, 66.9133)
  point P0 (-24.3221, 48.4133)
sketch "Sketch75" plane through (24.3221, -77.85, -48.4133) normal (0, -1, 0) x (1, 0, 0)
  line L0 (0.0279, 66.9133) -> (-5.9721, 66.9133) projected
  line L1 (0.0279, 66.9133) -> (-58.6081, 66.9133)
  line L2 (-58.6081, 66.9133) -> (-58.6081, -36.0072)
  line L3 (-58.6081, -36.0072) -> (0.0279, -36.0072)
  line L4 (0.0279, -36.0072) -> (0.0279, 66.9133)
  line L5 (-58.6081, -14.2867) -> (-22.1551, -14.2867)
  line L6 (-22.1551, -14.2867) -> (0.0279, -0.0031)
  line L7 (0.0279, -0.0031) -> (0.0279, 66.9133)
  line L8 (-58.6081, -14.2867) -> (-58.6081, 22.9494)
  line L9 (-58.6081, -14.2867) -> (-22.1551, -14.2867)
  line L10 (-58.6081, 22.1663) -> (-58.6081, -14.2867)
  line L11 (-58.6081, 22.1663) -> (0.0279, 66.9133)
extrude "Extrusion59" add sketch "Sketch75" against normal blind 6 contours L4 L6 L5 L2 L11
extrude "Extrusion60" cut sketch "Sketch75" against normal blind 6 contours L11 L2 L1 L0 | L4 L3 L2 L5 L6
sketch "Sketch76" plane through (30.35, -77.85, -48.4133) normal (0, -1, 0) x (1, 0, 0)
  line L0 (-6, 66.9133) -> (-12, 66.9133) projected
  line L1 (-6, 66.9133) -> (-12, 66.9133)
  line L2 (-64.6359, 22.1663) -> (-6, 66.9133) projected
  line L3 (-12, 66.9133) -> (-64.6359, 22.1663)
  line L4 (-64.6359, 22.1663) -> (-6, 66.9133)
  point P0 (-30.35, 48.4133)
extrude "Extrusion61" add sketch "Sketch76" against normal blind 6
sketch "Sketch77" plane through (30.35, -77.85, -48.4133) normal (0, -1, 0) x (1, 0, 0)
  point P0 (-30.35, 48.4133)
sketch "Sketch78" plane through (30.35, -77.85, -48.4133) normal (0, -1, 0) x (1, 0, 0)
  line L0 (-64.5, 72.9133) -> (-43, 72.9133)
  line L1 (-43, 72.9133) -> (-43, 5.4133)
  line L2 (-43, 5.4133) -> (-64.5, 5.4133)
  line L3 (-64.5, 5.4133) -> (-64.5, 72.9133)
  circle A0 centre (-43, 5.4133) radius 2.7
  point P0 (-30.35, 48.4133)
  dimension "d203" = 21.5
  dimension "d204" = 67.5
  dimension "d205" = 5.4
extrude "Extrusion62" cut sketch "Sketch78" against normal blind 10 contours A0 L2 L1 | L1 L2 A0
sketch "Sketch79" plane through (30.35, -77.85, -48.4133) normal (0, -1, 0) x (1, 0, 0)
  circle A0 centre (-43, 5.4133) radius 2.7 projected
  line L0 (-43, 5.4133) -> (-58, 5.4133)
  line L1 (-58, 5.4133) -> (-58, -9.5867)
  line L2 (-58, -9.5867) -> (-43, -9.5867)
  line L3 (-43, -9.5867) -> (-43, 5.4133)
  line L4 (-6, -0.0031) -> (-28.183, -14.2867) projected
  line L5 (-43, 5.4133) -> (-20.8837, 5.4133)
  line L6 (-20.8837, 5.4133) -> (-20.8837, -9.5867)
  line L7 (-20.8837, -9.5867) -> (-43, -9.5867)
  line L8 (-43, -9.5867) -> (-43, 5.4133)
  line L9 (-43, 5.4133) -> (-58, 5.4133)
  line L10 (-58, 5.4133) -> (-58, 20.4133)
  line L11 (-58, 20.4133) -> (-43, 20.4133)
  line L12 (-43, 20.4133) -> (-43, 5.4133)
  line L13 (-6, 66.9133) -> (-12, 66.9133) projected
  line L14 (-58, 20.4133) -> (-12, 66.9133)
  line L15 (-20.8837, -9.5867) -> (-19.2086, -25.0375)
  line L16 (-19.2086, -25.0375) -> (-82.6089, -27.6328)
  line L17 (-82.6089, -27.6328) -> (-82.6089, 32.6161)
  line L18 (-82.6089, 32.6161) -> (-12, 66.9133)
  point P0 (-30.35, 48.4133)
  dimension "d208" = 15
  dimension "d209" = 15
  dimension "d210" = 15
  dimension "d211" = 15
extrude "Extrusion63" cut sketch "Sketch79" against normal blind 10 contours L7 L15 L16 L17 L18 L14 L10 L1 L2
extrude "Extrusion64" cut sketch "Sketch57" against normal blind 20
sketch "Sketch80" plane through (30.35, -77.85, -48.4133) normal (0, -1, 0) x (1, 0, 0)
  line L0 (-60.7, 7.8729) -> (-60.7, -12.2867)
  line L1 (-60.7, -12.2867) -> (-37.5528, -12.2867)
  line L2 (-6, 24.0093) -> (-6, 66.9133)
  line L3 (-6, 66.9133) -> (-12.2668, 66.9133)
  circle A0 centre (-43, 5.4133) radius 2.7
  circle A1 centre (-43, 5.4133) radius 2.7
  line L4 (-58, 20.4133) -> (-12, 66.9133) projected
  line L5 (-6, 66.9133) -> (-6, 22.9133) projected
  line L6 (-12, 66.9133) -> (-6, 66.9133)
  line L7 (-6, 66.9133) -> (-6, -0.3604)
  circle A2 centre (-43, 5.4133) radius 2.7 projected
  circle A3 centre (-43, 5.4133) radius 2.7
  line L8 (-6, 22.9133) -> (-64.5, 22.9133) projected
  line L9 (-6, 22.9133) -> (-37.5528, -12.2867)
  line L10 (-60.7, 7.8729) -> (-12, 66.9133)
  line L11 (-6, 66.9133) -> (-99.5345, 66.9133)
  line L12 (-99.5345, 66.9133) -> (-99.5345, -44.4669)
  line L13 (-99.5345, -44.4669) -> (-6, -44.4669)
  line L14 (-6, -44.4669) -> (-6, 66.9133)
  point P0 (-19.7017, 74.4527)
  point P1 (-33.15, 48.4133)
  point P2 (-6, 22.9133)
  point P3 (-48.2938, 22.9133)
extrude "Extrusion65" cut sketch "Sketch80" against normal blind 6 contours L0 L1 L9 L7 L14 L13 L12 L11 L3 L4 L8 L10 | L8 L4 L10
extrude "Extrusion66" add sketch "Sketch80" against normal blind 6 contours L10 L8 L9 L1 L0
properties part number "DC23[L][F][T1]" material "Aluminio 6061"
